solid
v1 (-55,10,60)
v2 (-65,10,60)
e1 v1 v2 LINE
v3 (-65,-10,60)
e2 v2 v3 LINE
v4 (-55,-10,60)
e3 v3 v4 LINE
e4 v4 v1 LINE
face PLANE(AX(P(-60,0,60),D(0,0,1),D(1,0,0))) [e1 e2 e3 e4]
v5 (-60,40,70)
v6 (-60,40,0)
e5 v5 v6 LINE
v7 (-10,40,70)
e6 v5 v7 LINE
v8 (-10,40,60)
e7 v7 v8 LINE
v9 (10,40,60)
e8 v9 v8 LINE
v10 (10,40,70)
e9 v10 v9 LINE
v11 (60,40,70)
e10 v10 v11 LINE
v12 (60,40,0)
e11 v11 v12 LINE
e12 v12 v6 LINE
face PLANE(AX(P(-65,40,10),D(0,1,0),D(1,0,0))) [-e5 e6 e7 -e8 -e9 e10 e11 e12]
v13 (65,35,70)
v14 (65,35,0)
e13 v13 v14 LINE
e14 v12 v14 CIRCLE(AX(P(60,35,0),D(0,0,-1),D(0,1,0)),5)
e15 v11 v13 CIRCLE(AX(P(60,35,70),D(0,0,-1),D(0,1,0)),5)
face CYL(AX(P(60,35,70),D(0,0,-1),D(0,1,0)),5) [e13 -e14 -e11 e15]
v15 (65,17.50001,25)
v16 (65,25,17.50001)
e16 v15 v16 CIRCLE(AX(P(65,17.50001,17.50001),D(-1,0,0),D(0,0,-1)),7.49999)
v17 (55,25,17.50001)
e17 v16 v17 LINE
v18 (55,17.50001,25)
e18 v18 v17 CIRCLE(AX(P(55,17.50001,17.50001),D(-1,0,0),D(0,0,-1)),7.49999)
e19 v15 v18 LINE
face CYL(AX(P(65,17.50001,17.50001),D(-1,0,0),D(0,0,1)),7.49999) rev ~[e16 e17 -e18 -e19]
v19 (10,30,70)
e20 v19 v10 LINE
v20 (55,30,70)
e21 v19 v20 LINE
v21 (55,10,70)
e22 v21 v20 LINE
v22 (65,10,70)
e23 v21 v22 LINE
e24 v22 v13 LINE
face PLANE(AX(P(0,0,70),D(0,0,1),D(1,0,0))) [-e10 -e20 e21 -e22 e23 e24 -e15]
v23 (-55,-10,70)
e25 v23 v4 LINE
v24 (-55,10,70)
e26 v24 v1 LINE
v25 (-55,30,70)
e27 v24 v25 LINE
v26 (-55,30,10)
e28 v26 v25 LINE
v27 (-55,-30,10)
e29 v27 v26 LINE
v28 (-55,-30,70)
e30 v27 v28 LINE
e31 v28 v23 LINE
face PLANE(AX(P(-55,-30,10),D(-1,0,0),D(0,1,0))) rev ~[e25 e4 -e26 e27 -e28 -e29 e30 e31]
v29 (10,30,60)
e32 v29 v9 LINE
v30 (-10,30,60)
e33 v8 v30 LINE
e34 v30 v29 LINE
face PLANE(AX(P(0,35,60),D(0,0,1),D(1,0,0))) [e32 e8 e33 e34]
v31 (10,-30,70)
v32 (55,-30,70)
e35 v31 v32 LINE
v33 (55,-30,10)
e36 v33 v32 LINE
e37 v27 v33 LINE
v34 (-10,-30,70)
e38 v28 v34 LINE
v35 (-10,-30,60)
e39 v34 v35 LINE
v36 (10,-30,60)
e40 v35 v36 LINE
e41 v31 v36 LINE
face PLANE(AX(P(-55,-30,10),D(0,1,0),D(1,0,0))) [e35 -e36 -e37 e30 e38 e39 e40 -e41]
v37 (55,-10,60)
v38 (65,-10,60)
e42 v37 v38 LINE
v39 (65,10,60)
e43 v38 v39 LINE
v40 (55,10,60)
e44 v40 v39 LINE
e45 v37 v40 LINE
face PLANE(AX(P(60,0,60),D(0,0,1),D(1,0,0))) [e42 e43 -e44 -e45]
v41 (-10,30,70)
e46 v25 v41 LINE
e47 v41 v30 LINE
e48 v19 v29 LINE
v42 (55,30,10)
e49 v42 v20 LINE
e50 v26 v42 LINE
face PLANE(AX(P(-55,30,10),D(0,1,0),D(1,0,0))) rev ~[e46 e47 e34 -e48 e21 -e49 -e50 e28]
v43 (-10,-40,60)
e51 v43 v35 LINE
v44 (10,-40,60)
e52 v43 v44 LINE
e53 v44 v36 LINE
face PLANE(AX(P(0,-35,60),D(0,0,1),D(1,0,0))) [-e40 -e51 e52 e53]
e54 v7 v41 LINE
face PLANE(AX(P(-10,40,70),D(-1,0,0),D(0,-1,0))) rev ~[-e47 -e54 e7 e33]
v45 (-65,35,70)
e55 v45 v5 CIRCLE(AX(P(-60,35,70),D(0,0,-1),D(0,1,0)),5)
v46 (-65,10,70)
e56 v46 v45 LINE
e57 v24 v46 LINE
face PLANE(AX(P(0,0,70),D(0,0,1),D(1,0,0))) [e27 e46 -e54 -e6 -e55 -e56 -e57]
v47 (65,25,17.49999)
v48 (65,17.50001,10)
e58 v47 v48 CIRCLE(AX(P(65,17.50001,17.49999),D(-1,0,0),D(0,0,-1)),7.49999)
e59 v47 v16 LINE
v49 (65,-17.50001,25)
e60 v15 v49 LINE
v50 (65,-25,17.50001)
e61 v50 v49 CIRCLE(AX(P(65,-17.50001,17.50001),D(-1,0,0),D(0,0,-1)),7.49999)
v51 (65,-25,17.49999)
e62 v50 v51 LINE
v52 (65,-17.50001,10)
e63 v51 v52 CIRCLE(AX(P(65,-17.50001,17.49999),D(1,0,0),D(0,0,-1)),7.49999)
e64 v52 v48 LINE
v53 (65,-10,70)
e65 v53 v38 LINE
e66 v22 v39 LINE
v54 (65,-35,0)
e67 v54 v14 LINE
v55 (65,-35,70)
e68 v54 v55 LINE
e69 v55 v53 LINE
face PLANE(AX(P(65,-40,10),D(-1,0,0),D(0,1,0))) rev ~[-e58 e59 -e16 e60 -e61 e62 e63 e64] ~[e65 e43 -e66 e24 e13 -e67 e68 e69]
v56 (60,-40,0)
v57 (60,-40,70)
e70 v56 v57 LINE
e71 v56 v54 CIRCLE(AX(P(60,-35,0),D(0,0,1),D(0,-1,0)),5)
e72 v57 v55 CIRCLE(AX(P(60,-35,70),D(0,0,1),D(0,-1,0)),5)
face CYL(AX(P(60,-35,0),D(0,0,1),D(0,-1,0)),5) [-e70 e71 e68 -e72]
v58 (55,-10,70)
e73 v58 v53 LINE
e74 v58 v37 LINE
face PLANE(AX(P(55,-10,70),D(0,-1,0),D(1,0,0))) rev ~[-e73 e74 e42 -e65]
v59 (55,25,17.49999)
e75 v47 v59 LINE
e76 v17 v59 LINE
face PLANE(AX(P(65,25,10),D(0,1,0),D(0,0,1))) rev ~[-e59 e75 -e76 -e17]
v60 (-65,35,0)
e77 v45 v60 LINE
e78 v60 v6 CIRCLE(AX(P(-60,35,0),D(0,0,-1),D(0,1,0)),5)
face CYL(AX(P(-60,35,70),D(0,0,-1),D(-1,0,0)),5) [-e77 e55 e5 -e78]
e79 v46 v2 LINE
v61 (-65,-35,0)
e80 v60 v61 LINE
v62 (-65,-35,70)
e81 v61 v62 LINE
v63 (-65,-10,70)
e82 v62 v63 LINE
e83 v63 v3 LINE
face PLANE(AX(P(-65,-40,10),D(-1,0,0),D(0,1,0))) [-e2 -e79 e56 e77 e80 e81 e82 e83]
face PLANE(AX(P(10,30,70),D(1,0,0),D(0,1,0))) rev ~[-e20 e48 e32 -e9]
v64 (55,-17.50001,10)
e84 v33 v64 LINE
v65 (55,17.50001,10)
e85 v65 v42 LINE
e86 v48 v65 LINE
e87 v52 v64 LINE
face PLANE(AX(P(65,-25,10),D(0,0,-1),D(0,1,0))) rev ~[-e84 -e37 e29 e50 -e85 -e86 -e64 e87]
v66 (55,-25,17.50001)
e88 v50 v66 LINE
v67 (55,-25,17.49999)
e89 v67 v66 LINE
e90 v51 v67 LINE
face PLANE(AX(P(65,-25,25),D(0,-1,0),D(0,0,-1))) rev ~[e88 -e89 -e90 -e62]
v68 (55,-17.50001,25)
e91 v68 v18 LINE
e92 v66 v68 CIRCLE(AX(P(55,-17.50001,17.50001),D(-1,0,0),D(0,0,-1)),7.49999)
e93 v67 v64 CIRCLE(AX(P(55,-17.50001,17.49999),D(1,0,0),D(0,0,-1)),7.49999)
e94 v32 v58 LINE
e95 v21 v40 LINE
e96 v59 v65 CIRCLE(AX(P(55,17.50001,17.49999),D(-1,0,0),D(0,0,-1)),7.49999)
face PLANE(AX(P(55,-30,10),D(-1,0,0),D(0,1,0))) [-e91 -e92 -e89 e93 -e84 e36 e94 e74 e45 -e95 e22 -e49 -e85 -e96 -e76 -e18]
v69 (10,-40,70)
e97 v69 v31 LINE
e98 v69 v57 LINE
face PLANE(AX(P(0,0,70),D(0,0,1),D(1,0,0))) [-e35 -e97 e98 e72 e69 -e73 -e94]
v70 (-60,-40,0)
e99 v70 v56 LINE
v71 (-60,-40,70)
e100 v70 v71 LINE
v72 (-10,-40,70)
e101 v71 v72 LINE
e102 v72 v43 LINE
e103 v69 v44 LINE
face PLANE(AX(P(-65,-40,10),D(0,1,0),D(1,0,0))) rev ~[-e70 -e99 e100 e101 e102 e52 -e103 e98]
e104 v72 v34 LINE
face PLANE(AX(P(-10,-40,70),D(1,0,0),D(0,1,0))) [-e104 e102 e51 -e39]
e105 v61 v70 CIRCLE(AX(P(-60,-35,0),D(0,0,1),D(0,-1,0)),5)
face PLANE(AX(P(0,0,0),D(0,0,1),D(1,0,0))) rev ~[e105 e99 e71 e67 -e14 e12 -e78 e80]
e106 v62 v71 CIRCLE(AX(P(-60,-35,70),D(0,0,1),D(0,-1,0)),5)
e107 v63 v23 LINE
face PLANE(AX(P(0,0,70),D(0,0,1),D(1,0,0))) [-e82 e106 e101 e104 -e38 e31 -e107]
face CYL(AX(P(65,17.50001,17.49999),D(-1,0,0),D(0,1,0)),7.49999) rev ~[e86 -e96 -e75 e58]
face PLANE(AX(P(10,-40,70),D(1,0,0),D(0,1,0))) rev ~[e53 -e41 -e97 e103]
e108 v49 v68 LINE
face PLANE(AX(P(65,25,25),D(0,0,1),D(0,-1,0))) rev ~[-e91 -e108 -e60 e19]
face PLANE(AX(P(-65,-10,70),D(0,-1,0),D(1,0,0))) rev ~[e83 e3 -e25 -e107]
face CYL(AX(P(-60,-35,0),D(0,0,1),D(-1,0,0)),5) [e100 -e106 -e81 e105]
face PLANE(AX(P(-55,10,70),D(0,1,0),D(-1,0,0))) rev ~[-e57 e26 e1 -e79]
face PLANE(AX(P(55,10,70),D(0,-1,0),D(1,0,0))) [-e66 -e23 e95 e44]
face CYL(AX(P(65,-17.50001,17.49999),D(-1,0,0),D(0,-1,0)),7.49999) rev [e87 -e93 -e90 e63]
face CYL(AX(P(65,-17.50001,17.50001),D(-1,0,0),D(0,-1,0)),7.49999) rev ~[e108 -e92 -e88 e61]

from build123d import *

# Parameters (mm, degrees)
F1_DEPTH = 10
F2_W     = 130
F2_H     = 80
F2_W_2   = 110
F2_H_2   = 60
F3_DEPTH = 60
F4_W     = 20
F4_H     = 10
F4_W_2   = 10
F4_H_2   = 20
F5_DEPTH = 10
F6_R     = 5
F8_DEPTH = 25
F9_R     = 7.49999


# Not quite as in the source:
# - a fillet or chamfer is up to 0.001 mm smaller than in the source, because OpenCascade refuses the exact size


with BuildPart() as f1:
    # F0 (on Top) → F1 (new body)
    with BuildSketch(Plane.XY):
        Polygon((55, 40), (-55, 40), (-65, 40), (-65, -40), (-55, -40), (65, -40), (65, -30), (65, 40), align=None)
    extrude(amount=F1_DEPTH)

    # F2 (on face) → F3 (join)
    with BuildSketch(Plane.XY.offset(10)):
        Rectangle(F2_W, F2_H)
        Rectangle(F2_W_2, F2_H_2, mode=Mode.SUBTRACT)
    extrude(amount=F3_DEPTH)

    # F4 (on face) → F5 (cut)
    with BuildSketch(Plane.XY.offset(70)):
        Polygon((10, 30), (10, 40), (0, 40), (-10, 40), (-10, 30), align=None)
        Polygon((-65, 0), (-65, -10), (-55, -10), (-55, 10), (-65, 10), align=None)
        with Locations((0, -35)):
            Rectangle(F4_W, F4_H)
        with Locations((60, 0)):
            Rectangle(F4_W_2, F4_H_2)
    extrude(amount=-F5_DEPTH, mode=Mode.SUBTRACT)

    # F6
    f6_edges = [f1.edges().sort_by_distance(p)[0] for p in [
        (-65, -40, 35),
        (65, -40, 35),
        (-65, 40, 35),
        (65, 40, 35),
    ]]
    fillet(f6_edges, radius=F6_R)

    # F7 (on face) → F8 (cut)
    with BuildSketch(Plane.YZ.offset(65)):
        Polygon((-25, 10), (0, 10), (25, 10), (25, 25), (-25, 25), align=None)
    extrude(amount=-F8_DEPTH, mode=Mode.SUBTRACT)

    # F9 (radius 7.5 in the source; OpenCascade refuses exactly that, so slightly less here)
    f9_edges = [f1.edges().sort_by_distance(p)[0] for p in [
        (60, 25, 25),
        (60, 25, 10),
        (60, -25, 10),
        (60, -25, 25),
    ]]
    fillet(f9_edges, radius=F9_R)


solid = f1.part
